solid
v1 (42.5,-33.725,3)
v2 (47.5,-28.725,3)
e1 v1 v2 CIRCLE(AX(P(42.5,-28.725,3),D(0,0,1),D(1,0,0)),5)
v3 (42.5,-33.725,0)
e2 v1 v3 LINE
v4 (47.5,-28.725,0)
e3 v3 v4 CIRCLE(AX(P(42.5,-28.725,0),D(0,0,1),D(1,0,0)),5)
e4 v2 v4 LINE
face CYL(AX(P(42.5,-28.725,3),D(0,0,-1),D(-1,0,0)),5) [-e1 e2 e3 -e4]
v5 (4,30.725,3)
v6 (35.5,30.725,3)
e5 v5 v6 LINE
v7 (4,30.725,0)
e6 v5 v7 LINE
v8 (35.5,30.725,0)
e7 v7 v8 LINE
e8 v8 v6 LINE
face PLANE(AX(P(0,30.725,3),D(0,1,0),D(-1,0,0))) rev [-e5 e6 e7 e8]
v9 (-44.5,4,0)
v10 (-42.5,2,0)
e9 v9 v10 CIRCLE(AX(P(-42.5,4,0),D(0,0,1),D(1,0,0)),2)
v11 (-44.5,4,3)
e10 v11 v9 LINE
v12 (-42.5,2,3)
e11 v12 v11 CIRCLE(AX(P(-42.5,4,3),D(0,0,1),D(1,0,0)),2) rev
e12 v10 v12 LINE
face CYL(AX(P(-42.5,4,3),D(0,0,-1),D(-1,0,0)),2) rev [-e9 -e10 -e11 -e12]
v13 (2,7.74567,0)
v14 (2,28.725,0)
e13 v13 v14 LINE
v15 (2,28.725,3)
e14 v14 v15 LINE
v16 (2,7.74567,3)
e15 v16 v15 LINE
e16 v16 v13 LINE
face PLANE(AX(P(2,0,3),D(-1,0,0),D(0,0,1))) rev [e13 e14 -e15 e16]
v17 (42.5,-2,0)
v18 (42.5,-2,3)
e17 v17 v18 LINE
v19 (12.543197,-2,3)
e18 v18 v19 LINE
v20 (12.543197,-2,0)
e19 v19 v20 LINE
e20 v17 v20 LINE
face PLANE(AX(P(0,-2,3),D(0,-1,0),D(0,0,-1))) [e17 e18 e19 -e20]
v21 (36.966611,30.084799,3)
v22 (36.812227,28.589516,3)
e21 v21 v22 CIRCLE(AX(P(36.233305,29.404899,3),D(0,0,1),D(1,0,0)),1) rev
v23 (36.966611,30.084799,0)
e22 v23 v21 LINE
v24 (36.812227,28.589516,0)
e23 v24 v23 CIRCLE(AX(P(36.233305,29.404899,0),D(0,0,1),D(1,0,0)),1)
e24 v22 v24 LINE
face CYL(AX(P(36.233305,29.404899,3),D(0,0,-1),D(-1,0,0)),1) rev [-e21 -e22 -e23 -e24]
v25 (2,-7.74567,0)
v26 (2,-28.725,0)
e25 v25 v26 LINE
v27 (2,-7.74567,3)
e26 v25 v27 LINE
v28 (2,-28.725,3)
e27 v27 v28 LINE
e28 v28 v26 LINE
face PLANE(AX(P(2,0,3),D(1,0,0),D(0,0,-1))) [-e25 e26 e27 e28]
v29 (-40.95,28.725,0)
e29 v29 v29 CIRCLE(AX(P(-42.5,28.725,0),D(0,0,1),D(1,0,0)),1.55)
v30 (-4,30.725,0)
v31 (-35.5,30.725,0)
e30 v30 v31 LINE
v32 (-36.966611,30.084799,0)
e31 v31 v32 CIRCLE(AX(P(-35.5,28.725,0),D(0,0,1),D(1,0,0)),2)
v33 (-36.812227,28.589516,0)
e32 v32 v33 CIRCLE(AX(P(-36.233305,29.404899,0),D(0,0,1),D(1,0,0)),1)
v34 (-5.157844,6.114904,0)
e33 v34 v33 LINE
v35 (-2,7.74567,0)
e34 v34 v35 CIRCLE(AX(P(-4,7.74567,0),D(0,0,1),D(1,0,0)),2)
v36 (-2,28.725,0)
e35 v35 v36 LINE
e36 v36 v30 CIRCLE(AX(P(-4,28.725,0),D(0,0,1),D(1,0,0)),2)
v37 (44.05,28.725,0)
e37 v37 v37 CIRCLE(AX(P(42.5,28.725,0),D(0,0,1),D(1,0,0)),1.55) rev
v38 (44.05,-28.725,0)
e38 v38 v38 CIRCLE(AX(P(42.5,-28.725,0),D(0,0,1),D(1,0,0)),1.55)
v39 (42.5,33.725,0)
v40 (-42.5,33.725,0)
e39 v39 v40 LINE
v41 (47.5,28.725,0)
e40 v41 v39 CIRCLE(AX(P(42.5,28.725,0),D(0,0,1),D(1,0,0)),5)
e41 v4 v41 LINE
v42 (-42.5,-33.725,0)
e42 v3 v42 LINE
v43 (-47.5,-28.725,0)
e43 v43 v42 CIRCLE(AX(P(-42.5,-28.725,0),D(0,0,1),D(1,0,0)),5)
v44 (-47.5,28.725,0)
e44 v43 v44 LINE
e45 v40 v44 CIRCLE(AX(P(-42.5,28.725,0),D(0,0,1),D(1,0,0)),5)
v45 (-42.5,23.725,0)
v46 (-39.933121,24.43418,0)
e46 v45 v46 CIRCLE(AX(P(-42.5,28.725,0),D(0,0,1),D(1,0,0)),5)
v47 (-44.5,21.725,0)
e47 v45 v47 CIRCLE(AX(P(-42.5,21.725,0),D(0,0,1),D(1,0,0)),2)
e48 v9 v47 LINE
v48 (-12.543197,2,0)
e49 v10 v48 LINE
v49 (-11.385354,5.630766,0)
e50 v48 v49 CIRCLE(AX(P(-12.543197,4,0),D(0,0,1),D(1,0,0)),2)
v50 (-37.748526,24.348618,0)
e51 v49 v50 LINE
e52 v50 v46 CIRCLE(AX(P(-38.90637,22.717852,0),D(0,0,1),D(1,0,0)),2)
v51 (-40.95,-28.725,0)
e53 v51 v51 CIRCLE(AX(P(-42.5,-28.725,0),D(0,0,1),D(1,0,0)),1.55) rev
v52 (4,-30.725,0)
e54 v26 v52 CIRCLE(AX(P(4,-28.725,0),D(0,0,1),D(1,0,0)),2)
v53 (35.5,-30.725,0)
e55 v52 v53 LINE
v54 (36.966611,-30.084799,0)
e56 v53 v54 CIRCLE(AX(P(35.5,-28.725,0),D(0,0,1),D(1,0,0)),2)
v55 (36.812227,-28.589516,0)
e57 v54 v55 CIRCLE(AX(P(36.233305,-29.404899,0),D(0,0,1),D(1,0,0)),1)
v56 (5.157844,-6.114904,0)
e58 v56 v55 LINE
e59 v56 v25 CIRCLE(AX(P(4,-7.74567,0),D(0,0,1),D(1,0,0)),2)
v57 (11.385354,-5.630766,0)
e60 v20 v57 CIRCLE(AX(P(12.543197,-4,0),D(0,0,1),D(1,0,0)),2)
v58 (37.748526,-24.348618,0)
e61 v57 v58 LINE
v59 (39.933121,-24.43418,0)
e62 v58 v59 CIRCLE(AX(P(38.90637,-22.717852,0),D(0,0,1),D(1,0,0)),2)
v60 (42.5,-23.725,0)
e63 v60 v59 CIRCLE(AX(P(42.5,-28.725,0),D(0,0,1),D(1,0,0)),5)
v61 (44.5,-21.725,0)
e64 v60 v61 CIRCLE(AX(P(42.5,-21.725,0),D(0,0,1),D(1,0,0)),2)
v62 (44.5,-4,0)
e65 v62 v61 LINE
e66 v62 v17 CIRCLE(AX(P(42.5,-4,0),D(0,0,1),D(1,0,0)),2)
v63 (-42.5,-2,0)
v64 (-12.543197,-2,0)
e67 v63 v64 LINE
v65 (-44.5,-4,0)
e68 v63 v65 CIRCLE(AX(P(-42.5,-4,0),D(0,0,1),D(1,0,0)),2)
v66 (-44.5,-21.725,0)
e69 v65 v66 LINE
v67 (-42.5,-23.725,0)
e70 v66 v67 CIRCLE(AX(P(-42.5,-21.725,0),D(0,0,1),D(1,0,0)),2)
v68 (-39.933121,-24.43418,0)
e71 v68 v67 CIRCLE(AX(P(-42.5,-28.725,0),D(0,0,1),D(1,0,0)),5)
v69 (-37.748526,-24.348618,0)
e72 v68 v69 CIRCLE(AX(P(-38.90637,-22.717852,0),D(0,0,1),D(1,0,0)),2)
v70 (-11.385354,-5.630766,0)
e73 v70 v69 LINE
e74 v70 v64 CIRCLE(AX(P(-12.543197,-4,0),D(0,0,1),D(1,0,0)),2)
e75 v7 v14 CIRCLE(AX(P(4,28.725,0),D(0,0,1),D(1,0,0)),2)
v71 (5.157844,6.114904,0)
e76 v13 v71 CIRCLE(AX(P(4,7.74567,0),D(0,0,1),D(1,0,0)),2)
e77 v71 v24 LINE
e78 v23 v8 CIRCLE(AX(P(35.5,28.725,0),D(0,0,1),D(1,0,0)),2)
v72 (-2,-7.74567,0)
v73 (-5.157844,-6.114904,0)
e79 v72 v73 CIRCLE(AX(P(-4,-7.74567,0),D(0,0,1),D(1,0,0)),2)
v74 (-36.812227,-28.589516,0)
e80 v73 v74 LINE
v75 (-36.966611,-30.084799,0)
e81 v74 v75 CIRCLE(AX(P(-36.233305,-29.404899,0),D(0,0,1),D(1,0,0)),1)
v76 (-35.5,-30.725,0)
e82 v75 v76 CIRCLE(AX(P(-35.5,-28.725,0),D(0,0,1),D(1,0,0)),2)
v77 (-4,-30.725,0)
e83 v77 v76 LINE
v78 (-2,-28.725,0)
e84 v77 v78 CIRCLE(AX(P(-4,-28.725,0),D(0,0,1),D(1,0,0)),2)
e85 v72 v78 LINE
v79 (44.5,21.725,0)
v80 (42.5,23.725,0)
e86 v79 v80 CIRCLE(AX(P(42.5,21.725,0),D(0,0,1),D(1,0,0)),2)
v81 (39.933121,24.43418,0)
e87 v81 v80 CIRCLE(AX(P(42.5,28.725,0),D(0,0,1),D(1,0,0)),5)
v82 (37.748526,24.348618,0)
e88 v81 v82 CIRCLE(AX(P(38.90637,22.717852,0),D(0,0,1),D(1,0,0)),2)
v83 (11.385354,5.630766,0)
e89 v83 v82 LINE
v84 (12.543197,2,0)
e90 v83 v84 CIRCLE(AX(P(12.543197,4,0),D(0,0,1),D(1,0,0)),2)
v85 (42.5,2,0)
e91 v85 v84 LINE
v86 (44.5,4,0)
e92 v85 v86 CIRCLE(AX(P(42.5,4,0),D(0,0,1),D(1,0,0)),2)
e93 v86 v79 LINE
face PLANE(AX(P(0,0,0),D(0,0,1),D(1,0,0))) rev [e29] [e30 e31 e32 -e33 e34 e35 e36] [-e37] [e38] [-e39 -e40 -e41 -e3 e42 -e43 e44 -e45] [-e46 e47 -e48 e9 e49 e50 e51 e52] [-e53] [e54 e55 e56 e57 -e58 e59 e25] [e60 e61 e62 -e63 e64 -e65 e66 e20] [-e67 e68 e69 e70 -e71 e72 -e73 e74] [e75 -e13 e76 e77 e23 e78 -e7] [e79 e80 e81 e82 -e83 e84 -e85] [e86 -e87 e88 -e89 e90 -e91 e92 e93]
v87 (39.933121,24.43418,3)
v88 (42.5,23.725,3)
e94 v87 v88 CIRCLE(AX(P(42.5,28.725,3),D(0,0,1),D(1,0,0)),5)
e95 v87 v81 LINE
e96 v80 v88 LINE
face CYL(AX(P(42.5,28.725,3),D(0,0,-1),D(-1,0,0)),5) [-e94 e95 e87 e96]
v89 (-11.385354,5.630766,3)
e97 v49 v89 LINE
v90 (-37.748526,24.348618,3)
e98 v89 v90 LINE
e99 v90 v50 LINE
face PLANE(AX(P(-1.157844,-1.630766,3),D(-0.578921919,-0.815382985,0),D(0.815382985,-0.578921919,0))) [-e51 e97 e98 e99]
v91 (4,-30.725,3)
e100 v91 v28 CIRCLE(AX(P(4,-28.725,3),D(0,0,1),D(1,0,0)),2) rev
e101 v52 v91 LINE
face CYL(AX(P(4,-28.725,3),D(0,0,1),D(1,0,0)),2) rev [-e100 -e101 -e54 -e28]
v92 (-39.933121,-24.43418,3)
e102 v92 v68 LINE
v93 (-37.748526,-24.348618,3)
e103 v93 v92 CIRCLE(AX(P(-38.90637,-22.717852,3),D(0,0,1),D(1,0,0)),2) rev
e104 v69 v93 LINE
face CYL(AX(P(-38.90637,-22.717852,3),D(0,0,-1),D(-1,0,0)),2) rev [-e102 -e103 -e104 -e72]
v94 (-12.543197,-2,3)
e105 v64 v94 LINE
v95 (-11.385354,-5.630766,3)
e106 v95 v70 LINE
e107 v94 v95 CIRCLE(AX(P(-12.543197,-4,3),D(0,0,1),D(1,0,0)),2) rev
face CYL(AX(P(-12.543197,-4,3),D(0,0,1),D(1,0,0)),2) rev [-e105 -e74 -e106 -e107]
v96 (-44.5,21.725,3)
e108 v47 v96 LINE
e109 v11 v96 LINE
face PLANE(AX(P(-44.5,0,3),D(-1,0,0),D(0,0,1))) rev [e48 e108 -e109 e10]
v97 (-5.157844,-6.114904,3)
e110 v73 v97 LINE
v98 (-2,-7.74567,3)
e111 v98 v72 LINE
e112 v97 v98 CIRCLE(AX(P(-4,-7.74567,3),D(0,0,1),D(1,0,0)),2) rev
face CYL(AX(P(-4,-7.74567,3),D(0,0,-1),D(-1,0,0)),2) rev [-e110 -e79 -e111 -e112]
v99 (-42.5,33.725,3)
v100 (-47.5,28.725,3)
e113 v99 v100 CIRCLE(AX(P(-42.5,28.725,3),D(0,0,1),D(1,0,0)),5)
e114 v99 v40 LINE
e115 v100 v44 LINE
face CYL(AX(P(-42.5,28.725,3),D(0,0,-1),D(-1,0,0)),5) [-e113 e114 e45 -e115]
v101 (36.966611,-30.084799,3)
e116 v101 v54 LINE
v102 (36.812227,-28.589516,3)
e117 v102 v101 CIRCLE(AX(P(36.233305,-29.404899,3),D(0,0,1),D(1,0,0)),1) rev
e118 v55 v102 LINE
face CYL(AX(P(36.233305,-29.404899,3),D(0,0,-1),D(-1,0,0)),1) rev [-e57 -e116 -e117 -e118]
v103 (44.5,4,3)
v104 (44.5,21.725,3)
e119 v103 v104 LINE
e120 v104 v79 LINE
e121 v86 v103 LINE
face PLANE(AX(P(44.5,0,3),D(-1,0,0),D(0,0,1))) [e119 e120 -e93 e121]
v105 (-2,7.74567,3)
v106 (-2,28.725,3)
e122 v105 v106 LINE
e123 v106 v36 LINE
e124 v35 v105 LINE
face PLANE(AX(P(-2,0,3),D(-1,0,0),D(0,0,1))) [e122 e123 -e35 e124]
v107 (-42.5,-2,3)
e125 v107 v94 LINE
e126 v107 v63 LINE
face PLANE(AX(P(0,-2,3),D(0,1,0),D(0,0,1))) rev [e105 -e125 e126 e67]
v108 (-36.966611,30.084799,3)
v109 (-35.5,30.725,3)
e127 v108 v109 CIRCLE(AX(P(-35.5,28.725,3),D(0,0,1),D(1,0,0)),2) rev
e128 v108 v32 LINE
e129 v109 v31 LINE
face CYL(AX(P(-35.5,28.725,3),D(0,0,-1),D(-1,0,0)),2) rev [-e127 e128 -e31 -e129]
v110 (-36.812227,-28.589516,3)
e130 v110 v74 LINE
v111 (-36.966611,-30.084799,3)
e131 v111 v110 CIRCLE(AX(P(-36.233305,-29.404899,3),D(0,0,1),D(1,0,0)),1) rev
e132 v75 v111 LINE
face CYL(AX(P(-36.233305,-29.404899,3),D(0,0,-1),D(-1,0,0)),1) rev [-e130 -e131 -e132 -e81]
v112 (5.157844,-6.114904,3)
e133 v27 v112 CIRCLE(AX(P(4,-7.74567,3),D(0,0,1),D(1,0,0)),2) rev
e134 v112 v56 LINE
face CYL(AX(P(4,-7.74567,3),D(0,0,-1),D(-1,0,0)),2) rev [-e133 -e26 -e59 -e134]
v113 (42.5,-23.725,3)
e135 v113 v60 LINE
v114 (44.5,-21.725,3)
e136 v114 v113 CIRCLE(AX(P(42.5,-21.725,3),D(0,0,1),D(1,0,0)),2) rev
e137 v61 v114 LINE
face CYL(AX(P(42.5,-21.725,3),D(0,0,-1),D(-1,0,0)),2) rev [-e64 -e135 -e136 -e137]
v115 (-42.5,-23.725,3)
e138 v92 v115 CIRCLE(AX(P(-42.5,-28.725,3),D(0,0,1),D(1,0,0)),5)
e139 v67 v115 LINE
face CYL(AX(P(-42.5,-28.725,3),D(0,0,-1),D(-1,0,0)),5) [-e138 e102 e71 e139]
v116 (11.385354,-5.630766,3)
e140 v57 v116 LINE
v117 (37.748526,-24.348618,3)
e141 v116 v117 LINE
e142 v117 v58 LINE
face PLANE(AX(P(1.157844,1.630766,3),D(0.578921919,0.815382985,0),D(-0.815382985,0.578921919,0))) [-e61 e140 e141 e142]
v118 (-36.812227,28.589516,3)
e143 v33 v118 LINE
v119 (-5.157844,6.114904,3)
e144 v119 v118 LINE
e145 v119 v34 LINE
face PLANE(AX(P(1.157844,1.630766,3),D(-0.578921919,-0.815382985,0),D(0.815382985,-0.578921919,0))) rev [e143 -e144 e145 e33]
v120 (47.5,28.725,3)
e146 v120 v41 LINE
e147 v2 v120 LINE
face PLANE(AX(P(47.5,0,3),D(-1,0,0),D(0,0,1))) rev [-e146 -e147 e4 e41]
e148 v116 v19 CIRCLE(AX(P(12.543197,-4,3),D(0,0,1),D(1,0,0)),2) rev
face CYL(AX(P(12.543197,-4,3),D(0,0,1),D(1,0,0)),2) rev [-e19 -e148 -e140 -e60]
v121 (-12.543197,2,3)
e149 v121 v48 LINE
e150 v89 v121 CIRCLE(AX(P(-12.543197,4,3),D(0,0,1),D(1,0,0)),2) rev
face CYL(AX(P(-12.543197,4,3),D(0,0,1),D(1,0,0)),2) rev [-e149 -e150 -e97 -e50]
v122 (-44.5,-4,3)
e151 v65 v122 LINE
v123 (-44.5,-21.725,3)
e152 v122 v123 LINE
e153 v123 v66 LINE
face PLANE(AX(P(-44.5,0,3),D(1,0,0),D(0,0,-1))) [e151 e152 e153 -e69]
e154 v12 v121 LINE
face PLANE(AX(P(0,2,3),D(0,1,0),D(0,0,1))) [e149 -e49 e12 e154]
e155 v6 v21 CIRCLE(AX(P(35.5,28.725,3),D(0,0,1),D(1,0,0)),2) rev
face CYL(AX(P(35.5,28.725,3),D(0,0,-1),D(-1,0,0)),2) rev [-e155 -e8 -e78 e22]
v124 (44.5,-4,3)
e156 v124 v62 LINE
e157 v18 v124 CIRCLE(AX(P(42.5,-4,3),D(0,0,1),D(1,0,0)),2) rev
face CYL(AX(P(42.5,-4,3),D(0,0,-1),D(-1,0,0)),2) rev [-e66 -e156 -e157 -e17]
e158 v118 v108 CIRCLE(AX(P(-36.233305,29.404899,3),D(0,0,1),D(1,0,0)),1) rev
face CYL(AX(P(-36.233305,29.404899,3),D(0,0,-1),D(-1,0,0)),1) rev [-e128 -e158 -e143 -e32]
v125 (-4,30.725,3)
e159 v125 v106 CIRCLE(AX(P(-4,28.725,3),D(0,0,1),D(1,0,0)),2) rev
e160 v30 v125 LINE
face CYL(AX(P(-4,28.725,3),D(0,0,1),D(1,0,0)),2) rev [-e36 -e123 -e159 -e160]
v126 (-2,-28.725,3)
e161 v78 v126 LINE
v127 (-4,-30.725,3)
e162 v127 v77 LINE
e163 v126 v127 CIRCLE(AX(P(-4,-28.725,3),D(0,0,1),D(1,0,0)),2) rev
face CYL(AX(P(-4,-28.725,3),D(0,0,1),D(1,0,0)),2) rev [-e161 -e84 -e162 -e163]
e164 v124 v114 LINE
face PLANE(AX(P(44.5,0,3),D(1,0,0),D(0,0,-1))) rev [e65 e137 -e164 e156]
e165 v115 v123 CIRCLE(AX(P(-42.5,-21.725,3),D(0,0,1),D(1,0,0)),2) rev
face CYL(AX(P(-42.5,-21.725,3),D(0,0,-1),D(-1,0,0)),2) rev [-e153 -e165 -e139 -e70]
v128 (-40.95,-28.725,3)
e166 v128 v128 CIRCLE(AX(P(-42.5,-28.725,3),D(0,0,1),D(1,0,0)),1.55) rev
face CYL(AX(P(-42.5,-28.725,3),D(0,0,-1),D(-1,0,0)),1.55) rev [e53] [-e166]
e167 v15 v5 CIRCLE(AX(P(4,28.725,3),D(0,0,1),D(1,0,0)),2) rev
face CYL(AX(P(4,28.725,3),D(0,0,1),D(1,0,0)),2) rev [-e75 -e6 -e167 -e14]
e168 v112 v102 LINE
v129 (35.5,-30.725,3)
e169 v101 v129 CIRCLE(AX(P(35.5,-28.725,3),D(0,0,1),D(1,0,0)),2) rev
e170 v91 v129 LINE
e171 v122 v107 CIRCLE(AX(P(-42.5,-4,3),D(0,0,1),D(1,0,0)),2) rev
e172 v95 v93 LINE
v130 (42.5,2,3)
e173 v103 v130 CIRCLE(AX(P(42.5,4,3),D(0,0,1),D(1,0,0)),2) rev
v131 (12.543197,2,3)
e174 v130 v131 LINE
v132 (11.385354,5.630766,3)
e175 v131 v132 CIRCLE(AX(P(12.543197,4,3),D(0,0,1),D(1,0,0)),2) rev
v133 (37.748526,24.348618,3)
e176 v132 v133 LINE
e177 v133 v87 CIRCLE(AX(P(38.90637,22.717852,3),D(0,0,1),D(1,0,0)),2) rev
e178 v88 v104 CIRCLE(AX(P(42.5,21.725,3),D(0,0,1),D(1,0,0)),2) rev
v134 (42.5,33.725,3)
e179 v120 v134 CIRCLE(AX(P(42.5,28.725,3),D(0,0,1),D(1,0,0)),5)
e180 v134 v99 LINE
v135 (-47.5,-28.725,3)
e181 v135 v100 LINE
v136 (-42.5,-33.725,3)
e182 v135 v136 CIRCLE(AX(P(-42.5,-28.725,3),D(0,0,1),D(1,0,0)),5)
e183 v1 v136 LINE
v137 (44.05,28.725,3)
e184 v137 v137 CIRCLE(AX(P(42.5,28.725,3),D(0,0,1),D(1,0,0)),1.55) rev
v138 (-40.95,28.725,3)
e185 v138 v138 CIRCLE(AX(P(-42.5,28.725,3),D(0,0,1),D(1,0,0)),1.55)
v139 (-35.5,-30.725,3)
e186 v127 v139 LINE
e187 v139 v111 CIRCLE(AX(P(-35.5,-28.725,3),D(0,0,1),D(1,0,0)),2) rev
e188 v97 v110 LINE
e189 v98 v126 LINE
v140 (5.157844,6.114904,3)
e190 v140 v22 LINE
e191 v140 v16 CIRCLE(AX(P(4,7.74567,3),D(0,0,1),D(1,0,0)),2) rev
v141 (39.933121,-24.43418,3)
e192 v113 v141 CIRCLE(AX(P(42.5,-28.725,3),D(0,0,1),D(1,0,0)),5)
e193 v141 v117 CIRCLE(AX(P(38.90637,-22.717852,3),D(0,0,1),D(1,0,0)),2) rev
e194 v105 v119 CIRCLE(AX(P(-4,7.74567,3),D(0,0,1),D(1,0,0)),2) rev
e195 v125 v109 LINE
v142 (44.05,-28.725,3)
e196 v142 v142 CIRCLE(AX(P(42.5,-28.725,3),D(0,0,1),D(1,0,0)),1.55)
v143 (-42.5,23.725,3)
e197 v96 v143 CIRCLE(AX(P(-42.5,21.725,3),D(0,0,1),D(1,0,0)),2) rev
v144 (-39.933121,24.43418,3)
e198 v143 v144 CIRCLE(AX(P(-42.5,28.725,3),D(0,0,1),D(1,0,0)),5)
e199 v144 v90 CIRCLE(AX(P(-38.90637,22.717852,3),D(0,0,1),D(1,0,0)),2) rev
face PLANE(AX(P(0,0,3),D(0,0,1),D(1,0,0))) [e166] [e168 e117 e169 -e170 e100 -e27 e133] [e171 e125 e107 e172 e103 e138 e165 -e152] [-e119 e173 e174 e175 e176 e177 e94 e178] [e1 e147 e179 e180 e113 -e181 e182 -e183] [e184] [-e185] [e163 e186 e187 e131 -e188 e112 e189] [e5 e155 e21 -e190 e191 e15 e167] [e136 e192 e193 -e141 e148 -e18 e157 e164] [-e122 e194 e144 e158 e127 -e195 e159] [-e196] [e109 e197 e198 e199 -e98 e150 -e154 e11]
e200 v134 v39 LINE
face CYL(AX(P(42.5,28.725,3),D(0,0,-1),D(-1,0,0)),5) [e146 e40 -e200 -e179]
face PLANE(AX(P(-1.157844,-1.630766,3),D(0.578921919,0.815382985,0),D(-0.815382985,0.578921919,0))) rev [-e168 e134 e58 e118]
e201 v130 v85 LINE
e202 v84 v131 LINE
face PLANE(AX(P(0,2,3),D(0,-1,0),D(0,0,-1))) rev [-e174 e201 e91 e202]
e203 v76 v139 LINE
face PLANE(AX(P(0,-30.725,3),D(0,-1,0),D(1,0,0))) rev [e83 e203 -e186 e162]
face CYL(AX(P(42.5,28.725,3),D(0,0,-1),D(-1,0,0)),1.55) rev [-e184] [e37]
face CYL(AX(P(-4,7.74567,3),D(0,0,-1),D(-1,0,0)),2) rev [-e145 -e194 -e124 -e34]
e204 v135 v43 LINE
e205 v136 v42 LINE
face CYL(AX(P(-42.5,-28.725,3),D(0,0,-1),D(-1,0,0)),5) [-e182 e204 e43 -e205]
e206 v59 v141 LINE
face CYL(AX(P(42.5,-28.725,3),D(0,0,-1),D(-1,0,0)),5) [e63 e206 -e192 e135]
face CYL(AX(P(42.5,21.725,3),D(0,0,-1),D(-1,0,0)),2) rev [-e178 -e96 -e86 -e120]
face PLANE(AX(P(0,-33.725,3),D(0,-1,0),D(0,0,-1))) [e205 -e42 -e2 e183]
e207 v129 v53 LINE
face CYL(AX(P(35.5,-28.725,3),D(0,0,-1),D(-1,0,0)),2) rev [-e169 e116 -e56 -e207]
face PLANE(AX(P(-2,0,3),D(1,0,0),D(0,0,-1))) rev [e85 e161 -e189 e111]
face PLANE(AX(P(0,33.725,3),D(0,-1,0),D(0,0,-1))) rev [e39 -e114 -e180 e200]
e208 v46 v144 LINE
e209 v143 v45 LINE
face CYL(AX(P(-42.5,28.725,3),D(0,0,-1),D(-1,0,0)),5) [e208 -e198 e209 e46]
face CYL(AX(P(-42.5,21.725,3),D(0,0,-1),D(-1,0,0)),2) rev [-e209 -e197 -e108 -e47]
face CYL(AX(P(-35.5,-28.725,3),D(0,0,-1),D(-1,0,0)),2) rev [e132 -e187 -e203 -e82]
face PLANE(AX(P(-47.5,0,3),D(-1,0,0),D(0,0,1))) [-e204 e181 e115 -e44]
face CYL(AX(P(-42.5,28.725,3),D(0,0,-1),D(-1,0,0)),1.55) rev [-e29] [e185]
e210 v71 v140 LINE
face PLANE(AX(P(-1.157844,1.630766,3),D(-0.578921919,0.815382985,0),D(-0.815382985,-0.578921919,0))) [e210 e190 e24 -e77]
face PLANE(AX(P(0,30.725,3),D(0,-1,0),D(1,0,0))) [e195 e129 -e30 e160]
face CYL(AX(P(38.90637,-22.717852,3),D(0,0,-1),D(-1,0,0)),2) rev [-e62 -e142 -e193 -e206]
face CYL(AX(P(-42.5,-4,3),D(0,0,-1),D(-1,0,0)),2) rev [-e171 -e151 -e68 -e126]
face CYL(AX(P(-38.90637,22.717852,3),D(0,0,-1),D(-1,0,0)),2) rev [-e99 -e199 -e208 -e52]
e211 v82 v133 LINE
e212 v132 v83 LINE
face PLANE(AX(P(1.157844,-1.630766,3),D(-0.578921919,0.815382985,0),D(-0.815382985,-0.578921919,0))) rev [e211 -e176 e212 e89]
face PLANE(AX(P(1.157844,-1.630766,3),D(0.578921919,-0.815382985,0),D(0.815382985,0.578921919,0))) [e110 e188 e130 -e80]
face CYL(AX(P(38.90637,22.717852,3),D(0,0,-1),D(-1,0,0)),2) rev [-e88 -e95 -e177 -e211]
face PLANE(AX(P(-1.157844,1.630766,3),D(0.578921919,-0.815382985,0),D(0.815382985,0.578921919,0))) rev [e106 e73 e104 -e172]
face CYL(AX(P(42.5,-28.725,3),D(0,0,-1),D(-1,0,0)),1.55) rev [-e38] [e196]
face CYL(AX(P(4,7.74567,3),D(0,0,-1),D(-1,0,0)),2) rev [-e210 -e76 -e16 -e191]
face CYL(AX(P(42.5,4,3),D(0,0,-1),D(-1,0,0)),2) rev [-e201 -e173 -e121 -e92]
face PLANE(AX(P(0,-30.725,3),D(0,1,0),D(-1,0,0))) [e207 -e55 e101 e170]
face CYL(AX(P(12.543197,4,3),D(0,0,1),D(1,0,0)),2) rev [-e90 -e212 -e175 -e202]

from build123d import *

# Parameters (mm, degrees)
SKETCH_1_R      = 5
SKETCH_1_R_2    = 1.55
EXTRUDE_1_DEPTH = 3
FILLET_1_R      = 2
FILLET_2_R      = 1


with BuildPart() as part:
    # 草图1 → 凸台-拉伸1 (new body)
    # profile 1 of 5: a face of its own
    with BuildSketch(Plane.XY):
        with BuildLine():
            Line((-42.5, -33.725), (42.5, -33.725))
            ThreePointArc((42.5, -33.725), (39.761387212, -32.908300133), (37.917424305, -30.725))
            Line((37.917424305, -30.725), (2, -30.725))
            Line((2, -30.725), (2, -3.872835094))
            Line((2, -3.872835094), (37.513133211, -29.087159674))
            ThreePointArc((37.513133211, -29.087159674), (37.811061724, -26.988953387), (38.951354438, -25.202626557))
            Line((38.951354438, -25.202626557), (6.271598724, -2))
            Line((6.271598724, -2), (44.5, -2))
            Line((44.5, -2), (44.5, -24.142424305))
            ThreePointArc((44.5, -24.142424305), (46.683300133, -25.986387212), (47.5, -28.725))
            Line((47.5, -28.725), (47.5, 28.725))
            ThreePointArc((47.5, 28.725), (46.683300133, 25.986387212), (44.5, 24.142424305))
            Line((44.5, 24.142424305), (44.5, 2))
            Line((44.5, 2), (6.271598724, 2))
            Line((6.271598724, 2), (38.951354438, 25.202626557))
            ThreePointArc((38.951354438, 25.202626557), (37.811061724, 26.988953387), (37.513133211, 29.087159674))
            Line((37.513133211, 29.087159674), (2, 3.872835094))
            Line((2, 3.872835094), (2, 30.725))
            Line((2, 30.725), (37.917424305, 30.725))
            ThreePointArc((37.917424305, 30.725), (39.761387212, 32.908300133), (42.5, 33.725))
            Line((42.5, 33.725), (-42.5, 33.725))
            ThreePointArc((-42.5, 33.725), (-39.761387212, 32.908300133), (-37.917424305, 30.725))
            Line((-37.917424305, 30.725), (-2, 30.725))
            Line((-2, 30.725), (-2, 3.872835094))
            Line((-2, 3.872835094), (-37.513133211, 29.087159674))
            ThreePointArc((-37.513133211, 29.087159674), (-37.503284381, 28.906198862), (-37.5, 28.725))
            ThreePointArc((-37.5, 28.725), (-37.87705571, 26.820167699), (-38.951354438, 25.202626557))
            Line((-38.951354438, 25.202626557), (-6.271598724, 2))
            Line((-6.271598724, 2), (-44.5, 2))
            Line((-44.5, 2), (-44.5, 24.142424305))
            ThreePointArc((-44.5, 24.142424305), (-46.683300133, 25.986387212), (-47.5, 28.725))
            Line((-47.5, 28.725), (-47.5, -28.725))
            ThreePointArc((-47.5, -28.725), (-46.683300133, -25.986387212), (-44.5, -24.142424305))
            Line((-44.5, -24.142424305), (-44.5, -2))
            Line((-44.5, -2), (-6.271598724, -2))
            Line((-6.271598724, -2), (-38.951354438, -25.202626557))
            ThreePointArc((-38.951354438, -25.202626557), (-37.87705571, -26.820167699), (-37.5, -28.725))
            ThreePointArc((-37.5, -28.725), (-37.503284381, -28.906198862), (-37.513133211, -29.087159674))
            Line((-37.513133211, -29.087159674), (-2, -3.872835094))
            Line((-2, -3.872835094), (-2, -30.725))
            Line((-2, -30.725), (-37.917424305, -30.725))
            ThreePointArc((-37.917424305, -30.725), (-39.761387212, -32.908300133), (-42.5, -33.725))
        make_face()
    # profile 2 of 5: a face of its own
    with BuildSketch(Plane.XY):
        with Locations((-42.5, 28.725)):
            Circle(SKETCH_1_R)
        with Locations((-42.5, 28.725)):
            Circle(SKETCH_1_R_2, mode=Mode.SUBTRACT)
    # profile 3 of 5: a face of its own
    with BuildSketch(Plane.XY):
        with Locations((42.5, 28.725)):
            Circle(SKETCH_1_R)
        with Locations((42.5, 28.725)):
            Circle(SKETCH_1_R_2, mode=Mode.SUBTRACT)
    # profile 4 of 5: a face of its own
    with BuildSketch(Plane.XY):
        with Locations((42.5, -28.725)):
            Circle(SKETCH_1_R)
        with Locations((42.5, -28.725)):
            Circle(SKETCH_1_R_2, mode=Mode.SUBTRACT)
    # profile 5 of 5: a face of its own
    with BuildSketch(Plane.XY):
        with Locations((-42.5, -28.725)):
            Circle(SKETCH_1_R)
        with Locations((-42.5, -28.725)):
            Circle(SKETCH_1_R_2, mode=Mode.SUBTRACT)
    extrude(amount=EXTRUDE_1_DEPTH)

    # 圆角1
    # the kernel refuses this fillet: 2 mm, written as the material it adds along each edge
    with BuildSketch(Plane(origin=(38.951354438, 25.202626557, 0), x_dir=(-0.8153829846202765, -0.5789219190803973, 0), z_dir=(0, 0, 1)), Plane(origin=(-38.951354438, -25.202626557, 0), x_dir=(0.8153829846202759, 0.5789219190803978, 0), z_dir=(0, 0, 1))) as fillet_1_piece_1:
        with BuildLine():
            CenterArc((1.475169897, 2), FILLET_1_R, 203.736299512, 66.263700488)
            ThreePointArc((-0.355645617, 1.194944379), (-0.140432135, 0.608600598), (0, 0))
            Line((0, 0), (1.475169897, 0))
        make_face()
    extrude(amount=3)
    with BuildSketch(Plane(origin=(6.271598724, 2, 0), x_dir=(1, 0, 0), z_dir=(0, 0, 1)), Plane(origin=(6.271598724, -2, 0), x_dir=(0.8153829846202769, -0.5789219190803966, 0), z_dir=(0, 0, 1)), Plane(origin=(-6.271598724, -2, 0), x_dir=(-1, 0, 0), z_dir=(0, 0, 1)), Plane(origin=(-6.271598724, 2, 0), x_dir=(-0.8153829846202769, 0.5789219190803967, 0), z_dir=(0, 0, 1))) as fillet_1_piece_2:
        with BuildLine():
            CenterArc((FILLET_1_R * 3.13579936221, FILLET_1_R), FILLET_1_R, 125.374751844, 144.625248156)
            Line((FILLET_1_R * 2.55687744313, FILLET_1_R * 1.81538298462), (0, 0))
            Line((0, 0), (FILLET_1_R * 3.13579936221, 0))
        make_face()
    extrude(amount=3)
    with BuildSketch(Plane(origin=(44.5, 2, 0), x_dir=(0, 1, 0), z_dir=(0, 0, 1)), Plane(origin=(44.5, -2, 0), x_dir=(-1, 0, 0), z_dir=(0, 0, 1)), Plane(origin=(2, -30.725, 0), x_dir=(1, 0, 0), z_dir=(0, 0, 1)), Plane(origin=(-2, -30.725, 0), x_dir=(0, 1, 0), z_dir=(0, 0, 1)), Plane(origin=(-44.5, -2, 0), x_dir=(0, -1, 0), z_dir=(0, 0, 1)), Plane(origin=(-44.5, 2, 0), x_dir=(1, 0, 0), z_dir=(0, 0, 1)), Plane(origin=(-2, 30.725, 0), x_dir=(-1, 0, 0), z_dir=(0, 0, 1)), Plane(origin=(2, 30.725, 0), x_dir=(0, -1, 0), z_dir=(0, 0, 1))) as fillet_1_piece_3:
        with BuildLine():
            CenterArc((FILLET_1_R, FILLET_1_R), FILLET_1_R, 180, 90)
            Line((0, FILLET_1_R), (0, 0))
            Line((0, 0), (FILLET_1_R, 0))
        make_face()
    extrude(amount=3)
    with BuildSketch(Plane(origin=(44.5, 24.142424305, 0), x_dir=(0, -1, 0), z_dir=(0, 0, 1)), Plane(origin=(37.917424305, -30.725, 0), x_dir=(-1, 0, 0), z_dir=(0, 0, 1)), Plane(origin=(-44.5, -24.142424305, 0), x_dir=(0, 1, 0), z_dir=(0, 0, 1)), Plane(origin=(-37.917424305, 30.725, 0), x_dir=(1, 0, 0), z_dir=(0, 0, 1))) as fillet_1_piece_4:
        with BuildLine():
            CenterArc((2.417424305, -2), FILLET_1_R, 90, 90)
            ThreePointArc((0.417424305, -2), (0.31195587, -0.978451782), (0, 0))
            Line((0, 0), (2.417424305, 0))
        make_face()
    extrude(amount=3)
    with BuildSketch(Plane(origin=(44.5, -24.142424305, 0), x_dir=(0, 1, 0), z_dir=(0, 0, 1)), Plane(origin=(-37.917424305, -30.725, 0), x_dir=(1, 0, 0), z_dir=(0, 0, 1)), Plane(origin=(-44.5, 24.142424305, 0), x_dir=(0, -1, 0), z_dir=(0, 0, 1)), Plane(origin=(37.917424305, 30.725, 0), x_dir=(-1, 0, 0), z_dir=(0, 0, 1))) as fillet_1_piece_5:
        with BuildLine():
            CenterArc((2.417424305, 2), FILLET_1_R, 180, 90)
            ThreePointArc((0.417424305, 2), (0.31195587, 0.978451782), (0, 0))
            Line((0, 0), (2.417424305, 0))
        make_face()
    extrude(amount=3)
    with BuildSketch(Plane(origin=(38.951354438, -25.202626557, 0), x_dir=(-0.8153829846202785, 0.5789219190803946, 0), z_dir=(0, 0, 1)), Plane(origin=(-38.951354438, 25.202626557, 0), x_dir=(0.8153829846202768, -0.5789219190803968, 0), z_dir=(0, 0, 1))) as fillet_1_piece_6:
        with BuildLine():
            CenterArc((1.475169897, -2), FILLET_1_R, 90, 66.263700488)
            ThreePointArc((-0.355645617, -1.194944379), (-0.140432135, -0.608600598), (0, 0))
            Line((0, 0), (1.475169897, 0))
        make_face()
    extrude(amount=3)
    with BuildSketch(Plane(origin=(2, -3.872835094, 0), x_dir=(0, -1, 0), z_dir=(0, 0, 1)), Plane(origin=(-2, -3.872835094, 0), x_dir=(-0.8153829846202767, -0.5789219190803968, 0), z_dir=(0, 0, 1)), Plane(origin=(-2, 3.872835094, 0), x_dir=(0, 1, 0), z_dir=(0, 0, 1)), Plane(origin=(2, 3.872835094, 0), x_dir=(0.8153829846202766, 0.578921919080397, 0), z_dir=(0, 0, 1))) as fillet_1_piece_7:
        with BuildLine():
            CenterArc((FILLET_1_R * 1.93641754717, FILLET_1_R), FILLET_1_R, 144.625248156, 125.374751844)
            Line((FILLET_1_R * 1.12103456255, FILLET_1_R * 1.57892191908), (0, 0))
            Line((0, 0), (FILLET_1_R * 1.93641754717, 0))
        make_face()
    extrude(amount=3)
    with BuildSketch(Plane(origin=(37.513133211, -29.087159674, 0), x_dir=(-0.8153829846202749, 0.5789219190803994, 0), z_dir=(0, 0, 1)), Plane(origin=(-37.513133211, 29.087159674, 0), x_dir=(0.8153829846202781, -0.5789219190803949, 0), z_dir=(0, 0, 1))) as fillet_1_piece_8:
        with BuildLine():
            CenterArc((0.849166367, 2), FILLET_1_R, 227.759477208, 42.240522792)
            ThreePointArc((-0.495322353, 0.519341335), (-0.23833117, 0.268569172), (0, 0))
            Line((0, 0), (0.849166367, 0))
        make_face()
    extrude(amount=3)
    with BuildSketch(Plane(origin=(-37.513133211, -29.087159674, 0), x_dir=(0.8153829846202739, 0.5789219190804008, 0), z_dir=(0, 0, 1)), Plane(origin=(37.513133211, 29.087159674, 0), x_dir=(-0.8153829846202756, -0.5789219190803985, 0), z_dir=(0, 0, 1))) as fillet_1_piece_9:
        with BuildLine():
            CenterArc((0.849166367, -2), FILLET_1_R, 90, 42.240522792)
            ThreePointArc((-0.495322353, -0.519341335), (-0.23833117, -0.268569172), (0, 0))
            Line((0, 0), (0.849166367, 0))
        make_face()
    extrude(amount=3)

    # 圆角2
    fillet_2_edges = [part.edges().sort_by_distance(p)[0] for p in [
        (-37.422632563, 29.275893843, 1.5),
        (-37.422632563, -29.275893843, 1.5),
        (37.422632563, -29.275893843, 1.5),
        (37.422632563, 29.275893843, 1.5),
    ]]
    fillet(fillet_2_edges, radius=FILLET_2_R)


solid = part.part
